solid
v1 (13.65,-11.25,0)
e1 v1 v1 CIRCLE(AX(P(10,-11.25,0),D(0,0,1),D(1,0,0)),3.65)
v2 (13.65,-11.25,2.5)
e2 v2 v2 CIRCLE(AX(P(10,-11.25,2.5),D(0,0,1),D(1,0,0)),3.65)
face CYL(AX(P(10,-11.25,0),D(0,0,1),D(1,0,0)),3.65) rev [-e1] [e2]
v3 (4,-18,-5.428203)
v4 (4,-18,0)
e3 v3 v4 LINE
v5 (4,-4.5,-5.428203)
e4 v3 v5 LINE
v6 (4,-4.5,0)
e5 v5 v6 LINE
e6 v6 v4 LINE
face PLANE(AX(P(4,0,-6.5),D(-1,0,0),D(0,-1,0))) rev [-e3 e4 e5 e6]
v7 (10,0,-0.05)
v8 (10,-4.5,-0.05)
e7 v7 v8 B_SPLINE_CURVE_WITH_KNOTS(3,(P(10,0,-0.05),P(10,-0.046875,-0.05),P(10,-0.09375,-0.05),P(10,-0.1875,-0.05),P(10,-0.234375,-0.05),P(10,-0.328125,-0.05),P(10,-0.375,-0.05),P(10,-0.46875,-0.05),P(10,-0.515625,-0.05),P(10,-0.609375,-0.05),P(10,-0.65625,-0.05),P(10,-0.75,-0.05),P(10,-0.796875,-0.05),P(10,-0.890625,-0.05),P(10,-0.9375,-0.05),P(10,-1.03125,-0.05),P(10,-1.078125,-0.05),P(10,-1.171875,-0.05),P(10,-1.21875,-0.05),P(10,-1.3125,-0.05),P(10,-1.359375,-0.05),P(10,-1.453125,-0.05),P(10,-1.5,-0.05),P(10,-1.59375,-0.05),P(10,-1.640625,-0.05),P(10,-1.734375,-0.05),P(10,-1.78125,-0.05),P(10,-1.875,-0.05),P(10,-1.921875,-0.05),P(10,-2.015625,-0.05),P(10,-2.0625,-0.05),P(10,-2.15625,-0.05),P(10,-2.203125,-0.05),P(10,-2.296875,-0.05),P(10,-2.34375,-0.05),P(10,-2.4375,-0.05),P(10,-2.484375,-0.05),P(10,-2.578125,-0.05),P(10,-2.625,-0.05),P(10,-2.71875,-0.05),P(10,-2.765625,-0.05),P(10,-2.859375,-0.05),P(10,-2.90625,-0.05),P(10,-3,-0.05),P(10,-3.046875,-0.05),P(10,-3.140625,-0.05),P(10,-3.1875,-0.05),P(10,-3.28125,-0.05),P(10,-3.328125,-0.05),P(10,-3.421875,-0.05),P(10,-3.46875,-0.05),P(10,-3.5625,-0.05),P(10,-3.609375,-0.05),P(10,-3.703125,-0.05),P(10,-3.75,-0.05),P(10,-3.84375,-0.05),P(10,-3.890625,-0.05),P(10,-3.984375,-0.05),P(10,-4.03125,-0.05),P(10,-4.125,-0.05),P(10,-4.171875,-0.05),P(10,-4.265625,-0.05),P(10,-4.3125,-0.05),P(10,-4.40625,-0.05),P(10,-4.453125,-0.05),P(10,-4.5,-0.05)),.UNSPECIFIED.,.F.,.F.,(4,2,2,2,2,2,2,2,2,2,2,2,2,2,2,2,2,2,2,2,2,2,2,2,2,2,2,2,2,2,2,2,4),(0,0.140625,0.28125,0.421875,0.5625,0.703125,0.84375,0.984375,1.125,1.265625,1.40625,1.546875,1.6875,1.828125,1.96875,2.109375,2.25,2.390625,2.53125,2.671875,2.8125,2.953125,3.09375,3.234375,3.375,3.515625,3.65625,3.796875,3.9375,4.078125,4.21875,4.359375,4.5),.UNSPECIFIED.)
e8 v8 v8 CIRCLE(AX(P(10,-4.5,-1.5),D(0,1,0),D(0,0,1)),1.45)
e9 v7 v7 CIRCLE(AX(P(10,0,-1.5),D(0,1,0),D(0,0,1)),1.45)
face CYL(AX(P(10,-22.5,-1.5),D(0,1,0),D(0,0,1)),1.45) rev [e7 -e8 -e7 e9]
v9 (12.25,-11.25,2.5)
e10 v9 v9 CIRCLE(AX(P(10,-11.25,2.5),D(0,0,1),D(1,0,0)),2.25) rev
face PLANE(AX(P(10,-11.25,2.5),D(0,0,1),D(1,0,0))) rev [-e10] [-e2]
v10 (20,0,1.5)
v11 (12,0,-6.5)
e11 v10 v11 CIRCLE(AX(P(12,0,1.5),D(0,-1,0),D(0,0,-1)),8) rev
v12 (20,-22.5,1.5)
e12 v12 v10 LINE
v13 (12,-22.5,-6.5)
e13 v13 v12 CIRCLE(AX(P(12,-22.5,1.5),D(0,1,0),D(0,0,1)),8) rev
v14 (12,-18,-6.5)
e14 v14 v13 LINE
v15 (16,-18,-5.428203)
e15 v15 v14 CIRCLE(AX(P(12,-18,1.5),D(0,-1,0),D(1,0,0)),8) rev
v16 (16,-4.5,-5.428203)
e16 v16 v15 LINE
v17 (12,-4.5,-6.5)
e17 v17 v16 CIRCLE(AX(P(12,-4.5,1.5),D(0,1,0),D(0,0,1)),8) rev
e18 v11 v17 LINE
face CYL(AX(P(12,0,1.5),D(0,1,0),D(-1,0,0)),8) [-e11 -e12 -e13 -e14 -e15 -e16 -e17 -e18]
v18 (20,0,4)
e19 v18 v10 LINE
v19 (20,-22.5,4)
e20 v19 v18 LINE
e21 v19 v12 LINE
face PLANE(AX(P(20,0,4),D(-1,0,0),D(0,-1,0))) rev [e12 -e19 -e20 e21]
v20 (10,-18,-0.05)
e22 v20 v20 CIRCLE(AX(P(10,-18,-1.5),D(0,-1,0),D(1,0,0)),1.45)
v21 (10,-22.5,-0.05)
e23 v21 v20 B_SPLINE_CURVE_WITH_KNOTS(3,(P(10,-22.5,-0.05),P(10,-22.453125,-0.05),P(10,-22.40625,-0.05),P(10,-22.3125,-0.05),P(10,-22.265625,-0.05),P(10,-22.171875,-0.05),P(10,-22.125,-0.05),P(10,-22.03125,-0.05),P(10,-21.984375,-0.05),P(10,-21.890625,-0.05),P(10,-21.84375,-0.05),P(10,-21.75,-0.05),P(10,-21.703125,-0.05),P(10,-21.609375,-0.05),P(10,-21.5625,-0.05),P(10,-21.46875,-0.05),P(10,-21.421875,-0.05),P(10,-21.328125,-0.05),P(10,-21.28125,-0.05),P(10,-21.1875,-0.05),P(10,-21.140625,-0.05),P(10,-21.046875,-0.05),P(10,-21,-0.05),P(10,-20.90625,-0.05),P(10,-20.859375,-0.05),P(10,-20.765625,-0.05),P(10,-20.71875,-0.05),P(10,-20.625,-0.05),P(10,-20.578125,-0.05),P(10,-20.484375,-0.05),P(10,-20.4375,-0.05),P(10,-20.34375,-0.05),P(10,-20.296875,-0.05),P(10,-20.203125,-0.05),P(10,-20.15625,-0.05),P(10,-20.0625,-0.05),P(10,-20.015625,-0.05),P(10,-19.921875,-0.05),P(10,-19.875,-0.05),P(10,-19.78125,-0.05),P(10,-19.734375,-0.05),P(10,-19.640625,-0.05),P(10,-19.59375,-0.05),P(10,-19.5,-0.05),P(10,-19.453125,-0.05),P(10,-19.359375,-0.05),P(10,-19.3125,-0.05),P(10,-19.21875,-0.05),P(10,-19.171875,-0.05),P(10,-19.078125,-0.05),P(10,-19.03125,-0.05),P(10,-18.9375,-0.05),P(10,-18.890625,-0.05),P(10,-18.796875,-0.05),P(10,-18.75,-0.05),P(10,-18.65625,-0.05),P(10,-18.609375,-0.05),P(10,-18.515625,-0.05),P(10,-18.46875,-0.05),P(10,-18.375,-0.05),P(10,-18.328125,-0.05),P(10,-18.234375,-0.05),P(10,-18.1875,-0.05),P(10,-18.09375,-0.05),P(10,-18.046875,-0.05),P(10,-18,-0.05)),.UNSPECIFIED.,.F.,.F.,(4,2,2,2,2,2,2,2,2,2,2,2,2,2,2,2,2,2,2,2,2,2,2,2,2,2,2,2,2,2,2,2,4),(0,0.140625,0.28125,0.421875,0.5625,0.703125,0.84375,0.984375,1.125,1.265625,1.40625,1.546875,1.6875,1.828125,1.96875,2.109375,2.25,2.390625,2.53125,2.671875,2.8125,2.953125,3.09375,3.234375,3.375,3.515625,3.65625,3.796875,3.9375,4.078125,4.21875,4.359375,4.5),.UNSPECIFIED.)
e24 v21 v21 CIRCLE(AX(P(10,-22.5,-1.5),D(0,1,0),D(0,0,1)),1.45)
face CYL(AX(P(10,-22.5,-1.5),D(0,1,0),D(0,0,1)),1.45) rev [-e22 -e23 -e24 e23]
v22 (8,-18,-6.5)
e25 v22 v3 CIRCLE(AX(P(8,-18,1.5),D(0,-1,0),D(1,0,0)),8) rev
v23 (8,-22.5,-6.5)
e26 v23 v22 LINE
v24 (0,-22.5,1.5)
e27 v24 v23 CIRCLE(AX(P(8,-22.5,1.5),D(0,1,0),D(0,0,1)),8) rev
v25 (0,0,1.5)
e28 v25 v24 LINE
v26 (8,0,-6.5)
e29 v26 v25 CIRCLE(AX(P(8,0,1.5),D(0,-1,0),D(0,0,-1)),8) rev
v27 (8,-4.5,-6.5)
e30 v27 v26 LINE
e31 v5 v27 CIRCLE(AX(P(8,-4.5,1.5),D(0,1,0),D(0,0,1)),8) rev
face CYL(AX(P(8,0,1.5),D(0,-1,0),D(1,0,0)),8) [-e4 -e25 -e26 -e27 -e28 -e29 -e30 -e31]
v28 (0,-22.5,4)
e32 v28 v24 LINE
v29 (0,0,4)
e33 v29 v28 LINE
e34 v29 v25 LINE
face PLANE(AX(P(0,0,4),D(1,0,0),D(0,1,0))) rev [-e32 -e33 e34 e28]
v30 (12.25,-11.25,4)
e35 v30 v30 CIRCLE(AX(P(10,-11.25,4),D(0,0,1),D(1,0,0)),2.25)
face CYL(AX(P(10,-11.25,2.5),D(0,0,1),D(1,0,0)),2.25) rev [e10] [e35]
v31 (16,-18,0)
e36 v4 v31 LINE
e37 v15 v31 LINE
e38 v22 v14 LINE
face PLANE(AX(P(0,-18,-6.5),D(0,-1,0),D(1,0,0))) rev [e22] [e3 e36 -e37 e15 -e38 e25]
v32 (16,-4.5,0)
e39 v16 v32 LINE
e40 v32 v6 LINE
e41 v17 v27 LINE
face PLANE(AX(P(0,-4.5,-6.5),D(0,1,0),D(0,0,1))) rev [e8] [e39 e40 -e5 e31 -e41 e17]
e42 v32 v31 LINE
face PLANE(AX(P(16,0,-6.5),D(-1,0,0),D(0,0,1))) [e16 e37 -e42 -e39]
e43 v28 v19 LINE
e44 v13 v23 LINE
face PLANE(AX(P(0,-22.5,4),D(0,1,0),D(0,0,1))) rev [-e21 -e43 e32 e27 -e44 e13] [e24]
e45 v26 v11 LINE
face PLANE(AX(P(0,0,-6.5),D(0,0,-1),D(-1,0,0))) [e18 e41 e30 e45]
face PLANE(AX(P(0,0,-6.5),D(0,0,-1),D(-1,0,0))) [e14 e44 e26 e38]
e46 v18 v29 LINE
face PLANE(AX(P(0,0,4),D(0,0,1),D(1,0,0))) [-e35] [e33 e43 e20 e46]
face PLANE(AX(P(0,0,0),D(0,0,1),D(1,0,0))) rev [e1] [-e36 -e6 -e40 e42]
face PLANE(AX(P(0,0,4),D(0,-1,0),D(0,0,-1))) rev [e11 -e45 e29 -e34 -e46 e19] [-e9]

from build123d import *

# Parameters (mm, degrees)
SKETCH1_W           = 20
SKETCH1_H           = 22.5
BOSS_EXTRUDE1_DEPTH = 4
SKETCH2_R           = 2.25
CUT_EXTRUDE1_DEPTH  = 1.5
SKETCH3_R           = 3.65
CUT_EXTRUDE2_DEPTH  = 2.5
SKETCH4_W           = 4
SKETCH4_H           = 13.5
BOSS_EXTRUDE2_DEPTH = 6.5
SKETCH5_R           = 1.45
CUT_EXTRUDE3_DEPTH  = 31.797727189
FILLET1_R           = 8


with BuildPart() as part:
    # Sketch1 → Boss-Extrude1 (new body)
    with BuildSketch(Plane.XY):
        with Locations((10, -11.25)):
            Rectangle(SKETCH1_W, SKETCH1_H)
    extrude(amount=BOSS_EXTRUDE1_DEPTH)

    # Sketch2 → Cut-Extrude1 (cut)
    with BuildSketch(Plane.XY.offset(4)):
        with Locations((10, -11.25)):
            Circle(SKETCH2_R)
    extrude(amount=-CUT_EXTRUDE1_DEPTH, mode=Mode.SUBTRACT)

    # Sketch3 → Cut-Extrude2 (cut)
    with BuildSketch(Plane.XY.offset(2.5)):
        with Locations((10, -11.25)):
            Circle(SKETCH3_R)
    extrude(amount=-CUT_EXTRUDE2_DEPTH, mode=Mode.SUBTRACT)

    # Sketch4 → Boss-Extrude2 (add)
    with BuildSketch(Plane(origin=(0, 0, 0), x_dir=(-1, 0, 0), z_dir=(0, 0, -1))):
        with Locations((-18, -11.25)):
            Rectangle(SKETCH4_W, SKETCH4_H)
        Polygon((0, 0), (-20, 0), (-20, -4.5), (-16, -4.5), (-4, -4.5), (0, -4.5), align=None)
        with Locations((-2, -11.25)):
            Rectangle(SKETCH4_W, SKETCH4_H)
        Polygon((-16, -18), (-20, -18), (-20, -22.5), (0, -22.5), (0, -18), (-4, -18), align=None)
    extrude(amount=BOSS_EXTRUDE2_DEPTH)

    # Sketch5 → Cut-Extrude3 (cut, through all)
    with BuildSketch(Plane(origin=(0, 0, 0), x_dir=(1, 0, 0), z_dir=(0, 1, 0))):
        with Locations(Location((10, 1.5, 0), (0, 0, 270))):
            Circle(SKETCH5_R)
    extrude(amount=-CUT_EXTRUDE3_DEPTH, mode=Mode.SUBTRACT)

    # Fillet1
    # the kernel refuses this fillet: 8 mm, written as the material it takes off along each edge
    with BuildSketch(Plane(origin=(0, -42.5, -6.5), x_dir=(0, 0, 1), z_dir=(0, 1, 0)), Plane(origin=(20, 20, -6.5), x_dir=(0, 0, 1), z_dir=(0, -1, 0))) as fillet1_piece_1:
        with BuildLine():
            CenterArc((FILLET1_R, FILLET1_R), FILLET1_R, 180, 90)
            Line((0, FILLET1_R), (0, 0))
            Line((0, 0), (FILLET1_R, 0))
        make_face()
    extrude(amount=62.5, mode=Mode.SUBTRACT)


solid = part.part
